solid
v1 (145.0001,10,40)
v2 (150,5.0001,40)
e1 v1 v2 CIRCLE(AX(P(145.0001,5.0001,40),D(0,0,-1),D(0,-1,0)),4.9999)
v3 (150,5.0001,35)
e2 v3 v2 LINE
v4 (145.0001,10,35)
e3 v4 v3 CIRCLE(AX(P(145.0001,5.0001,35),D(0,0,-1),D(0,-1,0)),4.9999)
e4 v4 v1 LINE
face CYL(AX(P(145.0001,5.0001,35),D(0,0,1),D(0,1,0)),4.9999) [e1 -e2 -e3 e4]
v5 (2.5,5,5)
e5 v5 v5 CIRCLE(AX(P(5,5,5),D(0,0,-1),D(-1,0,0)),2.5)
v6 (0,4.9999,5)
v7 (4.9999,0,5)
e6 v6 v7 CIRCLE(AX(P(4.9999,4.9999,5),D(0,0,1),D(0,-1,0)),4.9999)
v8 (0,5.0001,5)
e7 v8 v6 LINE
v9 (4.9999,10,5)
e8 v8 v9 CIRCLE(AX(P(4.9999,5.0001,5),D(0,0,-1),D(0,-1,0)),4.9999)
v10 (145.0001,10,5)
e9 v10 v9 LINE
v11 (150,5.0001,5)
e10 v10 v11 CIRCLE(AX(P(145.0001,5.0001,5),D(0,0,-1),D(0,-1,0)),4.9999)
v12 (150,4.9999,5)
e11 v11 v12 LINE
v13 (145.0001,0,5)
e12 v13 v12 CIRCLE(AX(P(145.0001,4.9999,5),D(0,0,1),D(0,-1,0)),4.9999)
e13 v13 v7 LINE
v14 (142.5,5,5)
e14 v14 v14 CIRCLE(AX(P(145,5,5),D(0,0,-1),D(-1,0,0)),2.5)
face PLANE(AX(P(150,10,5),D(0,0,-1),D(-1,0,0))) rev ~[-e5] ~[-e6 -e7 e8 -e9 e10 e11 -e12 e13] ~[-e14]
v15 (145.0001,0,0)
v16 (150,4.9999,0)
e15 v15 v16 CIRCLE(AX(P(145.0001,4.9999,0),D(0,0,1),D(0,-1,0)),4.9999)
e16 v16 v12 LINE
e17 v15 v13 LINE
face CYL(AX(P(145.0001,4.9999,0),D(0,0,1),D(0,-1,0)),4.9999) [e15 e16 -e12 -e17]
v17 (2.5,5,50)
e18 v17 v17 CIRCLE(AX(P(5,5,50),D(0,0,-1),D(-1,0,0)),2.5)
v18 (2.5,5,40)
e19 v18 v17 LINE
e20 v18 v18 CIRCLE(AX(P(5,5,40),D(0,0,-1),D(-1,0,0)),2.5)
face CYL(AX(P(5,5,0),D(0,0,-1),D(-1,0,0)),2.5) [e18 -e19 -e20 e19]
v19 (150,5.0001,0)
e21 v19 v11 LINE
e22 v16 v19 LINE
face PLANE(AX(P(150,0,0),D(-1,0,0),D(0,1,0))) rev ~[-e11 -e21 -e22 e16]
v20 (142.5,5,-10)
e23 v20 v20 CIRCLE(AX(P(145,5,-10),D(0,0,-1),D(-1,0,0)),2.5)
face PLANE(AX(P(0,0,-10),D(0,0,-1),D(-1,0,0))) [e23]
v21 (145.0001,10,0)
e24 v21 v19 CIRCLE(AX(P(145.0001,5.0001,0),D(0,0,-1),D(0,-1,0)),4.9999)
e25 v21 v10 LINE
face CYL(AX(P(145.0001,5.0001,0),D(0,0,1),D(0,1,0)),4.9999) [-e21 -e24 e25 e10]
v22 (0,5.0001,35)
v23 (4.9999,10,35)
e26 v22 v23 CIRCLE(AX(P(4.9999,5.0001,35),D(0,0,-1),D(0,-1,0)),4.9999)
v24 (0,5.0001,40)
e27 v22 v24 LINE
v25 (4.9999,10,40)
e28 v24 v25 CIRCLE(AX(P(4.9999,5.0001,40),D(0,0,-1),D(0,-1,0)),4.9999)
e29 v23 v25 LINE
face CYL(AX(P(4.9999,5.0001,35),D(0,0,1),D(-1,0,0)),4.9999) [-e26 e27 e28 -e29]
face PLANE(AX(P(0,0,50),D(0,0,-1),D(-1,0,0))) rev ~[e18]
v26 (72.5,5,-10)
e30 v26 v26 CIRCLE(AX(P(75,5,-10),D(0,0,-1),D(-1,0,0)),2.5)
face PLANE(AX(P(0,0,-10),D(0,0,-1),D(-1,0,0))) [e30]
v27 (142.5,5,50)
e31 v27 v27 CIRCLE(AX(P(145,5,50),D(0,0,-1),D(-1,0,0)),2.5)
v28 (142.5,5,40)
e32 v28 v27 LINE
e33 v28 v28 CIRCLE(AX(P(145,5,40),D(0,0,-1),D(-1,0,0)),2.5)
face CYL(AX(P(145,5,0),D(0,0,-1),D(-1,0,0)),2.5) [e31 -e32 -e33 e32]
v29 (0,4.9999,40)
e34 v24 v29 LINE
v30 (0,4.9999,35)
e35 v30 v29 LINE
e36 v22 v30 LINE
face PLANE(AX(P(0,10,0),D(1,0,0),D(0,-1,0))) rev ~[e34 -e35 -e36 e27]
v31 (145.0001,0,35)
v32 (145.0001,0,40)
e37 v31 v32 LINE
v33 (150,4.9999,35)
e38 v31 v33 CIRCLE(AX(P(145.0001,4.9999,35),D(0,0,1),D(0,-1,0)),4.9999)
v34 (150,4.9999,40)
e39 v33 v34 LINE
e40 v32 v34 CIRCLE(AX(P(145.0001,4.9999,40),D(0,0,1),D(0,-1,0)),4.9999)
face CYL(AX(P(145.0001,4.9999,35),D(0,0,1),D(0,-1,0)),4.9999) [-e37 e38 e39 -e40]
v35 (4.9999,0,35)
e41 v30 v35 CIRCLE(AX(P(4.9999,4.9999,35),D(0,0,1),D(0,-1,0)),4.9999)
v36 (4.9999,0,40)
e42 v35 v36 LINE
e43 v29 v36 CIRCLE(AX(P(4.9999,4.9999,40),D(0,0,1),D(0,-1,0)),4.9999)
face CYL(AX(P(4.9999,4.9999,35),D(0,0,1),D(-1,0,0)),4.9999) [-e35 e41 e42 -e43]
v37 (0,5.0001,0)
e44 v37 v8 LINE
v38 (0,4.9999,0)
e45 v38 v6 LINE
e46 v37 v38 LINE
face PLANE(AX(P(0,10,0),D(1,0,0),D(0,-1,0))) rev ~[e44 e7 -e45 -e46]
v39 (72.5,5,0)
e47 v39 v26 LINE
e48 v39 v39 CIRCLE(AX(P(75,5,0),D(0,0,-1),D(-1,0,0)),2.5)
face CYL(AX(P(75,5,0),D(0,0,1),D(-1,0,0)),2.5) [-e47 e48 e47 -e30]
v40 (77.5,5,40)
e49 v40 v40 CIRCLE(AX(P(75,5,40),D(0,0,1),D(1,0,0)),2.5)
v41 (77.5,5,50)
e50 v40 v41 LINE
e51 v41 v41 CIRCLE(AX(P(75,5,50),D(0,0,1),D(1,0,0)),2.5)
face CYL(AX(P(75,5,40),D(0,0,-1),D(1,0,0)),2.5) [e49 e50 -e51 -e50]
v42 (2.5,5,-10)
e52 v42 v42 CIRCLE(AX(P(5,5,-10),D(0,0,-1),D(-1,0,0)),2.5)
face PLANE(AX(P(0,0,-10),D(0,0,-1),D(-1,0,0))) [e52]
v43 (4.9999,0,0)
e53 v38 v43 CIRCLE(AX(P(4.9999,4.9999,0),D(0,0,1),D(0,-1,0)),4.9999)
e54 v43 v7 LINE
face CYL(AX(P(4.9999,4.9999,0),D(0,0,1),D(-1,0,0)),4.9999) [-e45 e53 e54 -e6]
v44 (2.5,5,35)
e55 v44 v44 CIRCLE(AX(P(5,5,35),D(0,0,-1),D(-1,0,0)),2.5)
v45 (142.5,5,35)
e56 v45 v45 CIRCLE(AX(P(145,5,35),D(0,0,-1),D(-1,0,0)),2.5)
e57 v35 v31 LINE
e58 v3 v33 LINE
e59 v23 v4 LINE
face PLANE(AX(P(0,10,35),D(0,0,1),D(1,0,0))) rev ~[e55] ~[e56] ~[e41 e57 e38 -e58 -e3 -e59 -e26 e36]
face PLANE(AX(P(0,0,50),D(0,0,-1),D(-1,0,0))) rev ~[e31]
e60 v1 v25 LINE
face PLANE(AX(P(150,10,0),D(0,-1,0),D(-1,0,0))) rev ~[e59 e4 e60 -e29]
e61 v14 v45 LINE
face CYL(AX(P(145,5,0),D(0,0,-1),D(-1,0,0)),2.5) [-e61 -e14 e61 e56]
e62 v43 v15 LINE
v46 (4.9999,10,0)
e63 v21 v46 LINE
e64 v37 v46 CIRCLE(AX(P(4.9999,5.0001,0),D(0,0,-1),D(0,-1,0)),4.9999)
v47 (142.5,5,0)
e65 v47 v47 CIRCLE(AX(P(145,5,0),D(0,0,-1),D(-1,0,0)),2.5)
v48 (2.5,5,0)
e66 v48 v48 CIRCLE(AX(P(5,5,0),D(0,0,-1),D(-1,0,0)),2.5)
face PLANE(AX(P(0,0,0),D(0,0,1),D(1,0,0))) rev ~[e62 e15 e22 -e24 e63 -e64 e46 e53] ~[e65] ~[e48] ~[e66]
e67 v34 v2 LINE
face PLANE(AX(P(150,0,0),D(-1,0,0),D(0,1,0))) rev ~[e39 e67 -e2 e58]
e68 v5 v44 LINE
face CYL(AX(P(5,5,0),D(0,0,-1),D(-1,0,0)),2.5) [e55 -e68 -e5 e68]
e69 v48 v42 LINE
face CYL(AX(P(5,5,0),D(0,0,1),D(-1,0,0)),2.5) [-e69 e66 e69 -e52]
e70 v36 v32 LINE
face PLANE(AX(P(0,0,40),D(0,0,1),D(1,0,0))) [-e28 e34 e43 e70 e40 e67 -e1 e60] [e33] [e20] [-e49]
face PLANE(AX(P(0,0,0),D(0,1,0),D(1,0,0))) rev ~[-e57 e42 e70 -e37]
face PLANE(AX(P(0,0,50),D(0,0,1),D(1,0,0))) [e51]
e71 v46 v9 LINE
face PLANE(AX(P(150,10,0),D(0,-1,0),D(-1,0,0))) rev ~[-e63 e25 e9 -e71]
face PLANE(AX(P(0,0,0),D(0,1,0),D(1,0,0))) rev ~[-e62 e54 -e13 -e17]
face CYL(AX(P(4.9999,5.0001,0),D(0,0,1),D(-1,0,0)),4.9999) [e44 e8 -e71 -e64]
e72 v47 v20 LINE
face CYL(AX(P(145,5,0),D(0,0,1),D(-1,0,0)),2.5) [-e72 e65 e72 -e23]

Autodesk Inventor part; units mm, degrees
ref_plane "YZ Plane" through (0, 0, 0) normal (1, 0, 0) x (0, 1, 0)
ref_plane "XZ Plane" through (0, 0, 0) normal (0, 1, 0) x (-1, 0, 0)
ref_plane "XY Plane" through (0, 0, 0) normal (0, 0, 1) x (1, 0, 0)
sketch "Sketch1" plane through (0, 0, 0) normal (0, 0, 1) x (1, 0, 0)
  line L0 (0, 0) -> (150, 0)
  line L1 (150, 0) -> (150, 10)
  line L2 (150, 10) -> (0, 10)
  line L3 (0, 10) -> (0, 0)
  dimension "d0" = 10
  dimension "d1" = 150
extrude "Extrusion1" add sketch "Sketch1" along normal blind 40
sketch "Sketch2" plane through (0, 10, 0) normal (0, 1, 0) x (1, 0, 0)
  line L0 (0, -35) -> (150, -35)
  line L1 (150, -35) -> (150, -5)
  line L2 (150, -5) -> (0, -5)
  line L3 (0, -5) -> (0, -35)
  line L4 (0, 0) -> (0, -40) projected
  line L5 (150, 0) -> (150, -40) projected
  line L6 (150, 0) -> (0, 0) projected
  line L7 (150, -40) -> (0, -40) projected
  dimension "d4" = 0
  dimension "d5" = 0
  dimension "d6" = 5
  dimension "d7" = 5
extrude "Extrusion2" cut sketch "Sketch2" against normal blind 10 contours L3 L2 L1 L0
sketch "Sketch3" plane through (0, 10, 5) normal (0, 0, 1) x (1, 0, 0)
  point P0 (0, -10)
sketch "Sketch4" plane through (0, 0, 0) normal (0, 0, -1) x (-1, 0, 0)
  circle A0 centre (-5, 5) radius 2.5
  circle A1 centre (-145, 5) radius 2.5
  line L0 (-150, 0) -> (-150, 10) projected
  line L1 (0, 0) -> (-150, 0) projected
  line L2 (-150, 10) -> (0, 10) projected
  line L3 (0, 10) -> (0, 0) projected
  circle A2 centre (-75, 5) radius 2.5
  dimension "d10" = 5
  dimension "d11" = 5
  dimension "d12" = 5
  dimension "d13" = 5
  dimension "d14" = 5
  dimension "d15" = 5
  dimension "d21" = 70
  dimension "d22" = 5
  dimension "d23" = 5
extrude "Extrusion3" add sketch "Sketch4" along normal blind 10 and the other way blind 50 contours A0 | A1
fillet "Fillet1" radius 5 8 edges at (150, 10, 37.5) (150, 10, 2.5) (0, 10, 37.5) (0, 10, 2.5) (150, 0, 37.5) (150, 0, 2.5) (0, 0, 37.5) (0, 0, 2.5)
extrude "Extrusion4" add sketch "Sketch4" along normal blind 10 contours A2
sketch "Sketch5" plane through (0, 0, 40) normal (0, 0, 1) x (1, 0, 0)
  circle A0 centre (75, 5) radius 2.5
  circle A1 centre (5, 5) radius 2.5 projected
  line L0 (5, 0) -> (145, 0) projected
  point P0 (0, 0)
  dimension "d26" = 70
  dimension "d27" = 5
  dimension "d28" = 5
extrude "Extrusion5" add sketch "Sketch5" along normal blind 10 contours A0
properties part number "Joint 2"
